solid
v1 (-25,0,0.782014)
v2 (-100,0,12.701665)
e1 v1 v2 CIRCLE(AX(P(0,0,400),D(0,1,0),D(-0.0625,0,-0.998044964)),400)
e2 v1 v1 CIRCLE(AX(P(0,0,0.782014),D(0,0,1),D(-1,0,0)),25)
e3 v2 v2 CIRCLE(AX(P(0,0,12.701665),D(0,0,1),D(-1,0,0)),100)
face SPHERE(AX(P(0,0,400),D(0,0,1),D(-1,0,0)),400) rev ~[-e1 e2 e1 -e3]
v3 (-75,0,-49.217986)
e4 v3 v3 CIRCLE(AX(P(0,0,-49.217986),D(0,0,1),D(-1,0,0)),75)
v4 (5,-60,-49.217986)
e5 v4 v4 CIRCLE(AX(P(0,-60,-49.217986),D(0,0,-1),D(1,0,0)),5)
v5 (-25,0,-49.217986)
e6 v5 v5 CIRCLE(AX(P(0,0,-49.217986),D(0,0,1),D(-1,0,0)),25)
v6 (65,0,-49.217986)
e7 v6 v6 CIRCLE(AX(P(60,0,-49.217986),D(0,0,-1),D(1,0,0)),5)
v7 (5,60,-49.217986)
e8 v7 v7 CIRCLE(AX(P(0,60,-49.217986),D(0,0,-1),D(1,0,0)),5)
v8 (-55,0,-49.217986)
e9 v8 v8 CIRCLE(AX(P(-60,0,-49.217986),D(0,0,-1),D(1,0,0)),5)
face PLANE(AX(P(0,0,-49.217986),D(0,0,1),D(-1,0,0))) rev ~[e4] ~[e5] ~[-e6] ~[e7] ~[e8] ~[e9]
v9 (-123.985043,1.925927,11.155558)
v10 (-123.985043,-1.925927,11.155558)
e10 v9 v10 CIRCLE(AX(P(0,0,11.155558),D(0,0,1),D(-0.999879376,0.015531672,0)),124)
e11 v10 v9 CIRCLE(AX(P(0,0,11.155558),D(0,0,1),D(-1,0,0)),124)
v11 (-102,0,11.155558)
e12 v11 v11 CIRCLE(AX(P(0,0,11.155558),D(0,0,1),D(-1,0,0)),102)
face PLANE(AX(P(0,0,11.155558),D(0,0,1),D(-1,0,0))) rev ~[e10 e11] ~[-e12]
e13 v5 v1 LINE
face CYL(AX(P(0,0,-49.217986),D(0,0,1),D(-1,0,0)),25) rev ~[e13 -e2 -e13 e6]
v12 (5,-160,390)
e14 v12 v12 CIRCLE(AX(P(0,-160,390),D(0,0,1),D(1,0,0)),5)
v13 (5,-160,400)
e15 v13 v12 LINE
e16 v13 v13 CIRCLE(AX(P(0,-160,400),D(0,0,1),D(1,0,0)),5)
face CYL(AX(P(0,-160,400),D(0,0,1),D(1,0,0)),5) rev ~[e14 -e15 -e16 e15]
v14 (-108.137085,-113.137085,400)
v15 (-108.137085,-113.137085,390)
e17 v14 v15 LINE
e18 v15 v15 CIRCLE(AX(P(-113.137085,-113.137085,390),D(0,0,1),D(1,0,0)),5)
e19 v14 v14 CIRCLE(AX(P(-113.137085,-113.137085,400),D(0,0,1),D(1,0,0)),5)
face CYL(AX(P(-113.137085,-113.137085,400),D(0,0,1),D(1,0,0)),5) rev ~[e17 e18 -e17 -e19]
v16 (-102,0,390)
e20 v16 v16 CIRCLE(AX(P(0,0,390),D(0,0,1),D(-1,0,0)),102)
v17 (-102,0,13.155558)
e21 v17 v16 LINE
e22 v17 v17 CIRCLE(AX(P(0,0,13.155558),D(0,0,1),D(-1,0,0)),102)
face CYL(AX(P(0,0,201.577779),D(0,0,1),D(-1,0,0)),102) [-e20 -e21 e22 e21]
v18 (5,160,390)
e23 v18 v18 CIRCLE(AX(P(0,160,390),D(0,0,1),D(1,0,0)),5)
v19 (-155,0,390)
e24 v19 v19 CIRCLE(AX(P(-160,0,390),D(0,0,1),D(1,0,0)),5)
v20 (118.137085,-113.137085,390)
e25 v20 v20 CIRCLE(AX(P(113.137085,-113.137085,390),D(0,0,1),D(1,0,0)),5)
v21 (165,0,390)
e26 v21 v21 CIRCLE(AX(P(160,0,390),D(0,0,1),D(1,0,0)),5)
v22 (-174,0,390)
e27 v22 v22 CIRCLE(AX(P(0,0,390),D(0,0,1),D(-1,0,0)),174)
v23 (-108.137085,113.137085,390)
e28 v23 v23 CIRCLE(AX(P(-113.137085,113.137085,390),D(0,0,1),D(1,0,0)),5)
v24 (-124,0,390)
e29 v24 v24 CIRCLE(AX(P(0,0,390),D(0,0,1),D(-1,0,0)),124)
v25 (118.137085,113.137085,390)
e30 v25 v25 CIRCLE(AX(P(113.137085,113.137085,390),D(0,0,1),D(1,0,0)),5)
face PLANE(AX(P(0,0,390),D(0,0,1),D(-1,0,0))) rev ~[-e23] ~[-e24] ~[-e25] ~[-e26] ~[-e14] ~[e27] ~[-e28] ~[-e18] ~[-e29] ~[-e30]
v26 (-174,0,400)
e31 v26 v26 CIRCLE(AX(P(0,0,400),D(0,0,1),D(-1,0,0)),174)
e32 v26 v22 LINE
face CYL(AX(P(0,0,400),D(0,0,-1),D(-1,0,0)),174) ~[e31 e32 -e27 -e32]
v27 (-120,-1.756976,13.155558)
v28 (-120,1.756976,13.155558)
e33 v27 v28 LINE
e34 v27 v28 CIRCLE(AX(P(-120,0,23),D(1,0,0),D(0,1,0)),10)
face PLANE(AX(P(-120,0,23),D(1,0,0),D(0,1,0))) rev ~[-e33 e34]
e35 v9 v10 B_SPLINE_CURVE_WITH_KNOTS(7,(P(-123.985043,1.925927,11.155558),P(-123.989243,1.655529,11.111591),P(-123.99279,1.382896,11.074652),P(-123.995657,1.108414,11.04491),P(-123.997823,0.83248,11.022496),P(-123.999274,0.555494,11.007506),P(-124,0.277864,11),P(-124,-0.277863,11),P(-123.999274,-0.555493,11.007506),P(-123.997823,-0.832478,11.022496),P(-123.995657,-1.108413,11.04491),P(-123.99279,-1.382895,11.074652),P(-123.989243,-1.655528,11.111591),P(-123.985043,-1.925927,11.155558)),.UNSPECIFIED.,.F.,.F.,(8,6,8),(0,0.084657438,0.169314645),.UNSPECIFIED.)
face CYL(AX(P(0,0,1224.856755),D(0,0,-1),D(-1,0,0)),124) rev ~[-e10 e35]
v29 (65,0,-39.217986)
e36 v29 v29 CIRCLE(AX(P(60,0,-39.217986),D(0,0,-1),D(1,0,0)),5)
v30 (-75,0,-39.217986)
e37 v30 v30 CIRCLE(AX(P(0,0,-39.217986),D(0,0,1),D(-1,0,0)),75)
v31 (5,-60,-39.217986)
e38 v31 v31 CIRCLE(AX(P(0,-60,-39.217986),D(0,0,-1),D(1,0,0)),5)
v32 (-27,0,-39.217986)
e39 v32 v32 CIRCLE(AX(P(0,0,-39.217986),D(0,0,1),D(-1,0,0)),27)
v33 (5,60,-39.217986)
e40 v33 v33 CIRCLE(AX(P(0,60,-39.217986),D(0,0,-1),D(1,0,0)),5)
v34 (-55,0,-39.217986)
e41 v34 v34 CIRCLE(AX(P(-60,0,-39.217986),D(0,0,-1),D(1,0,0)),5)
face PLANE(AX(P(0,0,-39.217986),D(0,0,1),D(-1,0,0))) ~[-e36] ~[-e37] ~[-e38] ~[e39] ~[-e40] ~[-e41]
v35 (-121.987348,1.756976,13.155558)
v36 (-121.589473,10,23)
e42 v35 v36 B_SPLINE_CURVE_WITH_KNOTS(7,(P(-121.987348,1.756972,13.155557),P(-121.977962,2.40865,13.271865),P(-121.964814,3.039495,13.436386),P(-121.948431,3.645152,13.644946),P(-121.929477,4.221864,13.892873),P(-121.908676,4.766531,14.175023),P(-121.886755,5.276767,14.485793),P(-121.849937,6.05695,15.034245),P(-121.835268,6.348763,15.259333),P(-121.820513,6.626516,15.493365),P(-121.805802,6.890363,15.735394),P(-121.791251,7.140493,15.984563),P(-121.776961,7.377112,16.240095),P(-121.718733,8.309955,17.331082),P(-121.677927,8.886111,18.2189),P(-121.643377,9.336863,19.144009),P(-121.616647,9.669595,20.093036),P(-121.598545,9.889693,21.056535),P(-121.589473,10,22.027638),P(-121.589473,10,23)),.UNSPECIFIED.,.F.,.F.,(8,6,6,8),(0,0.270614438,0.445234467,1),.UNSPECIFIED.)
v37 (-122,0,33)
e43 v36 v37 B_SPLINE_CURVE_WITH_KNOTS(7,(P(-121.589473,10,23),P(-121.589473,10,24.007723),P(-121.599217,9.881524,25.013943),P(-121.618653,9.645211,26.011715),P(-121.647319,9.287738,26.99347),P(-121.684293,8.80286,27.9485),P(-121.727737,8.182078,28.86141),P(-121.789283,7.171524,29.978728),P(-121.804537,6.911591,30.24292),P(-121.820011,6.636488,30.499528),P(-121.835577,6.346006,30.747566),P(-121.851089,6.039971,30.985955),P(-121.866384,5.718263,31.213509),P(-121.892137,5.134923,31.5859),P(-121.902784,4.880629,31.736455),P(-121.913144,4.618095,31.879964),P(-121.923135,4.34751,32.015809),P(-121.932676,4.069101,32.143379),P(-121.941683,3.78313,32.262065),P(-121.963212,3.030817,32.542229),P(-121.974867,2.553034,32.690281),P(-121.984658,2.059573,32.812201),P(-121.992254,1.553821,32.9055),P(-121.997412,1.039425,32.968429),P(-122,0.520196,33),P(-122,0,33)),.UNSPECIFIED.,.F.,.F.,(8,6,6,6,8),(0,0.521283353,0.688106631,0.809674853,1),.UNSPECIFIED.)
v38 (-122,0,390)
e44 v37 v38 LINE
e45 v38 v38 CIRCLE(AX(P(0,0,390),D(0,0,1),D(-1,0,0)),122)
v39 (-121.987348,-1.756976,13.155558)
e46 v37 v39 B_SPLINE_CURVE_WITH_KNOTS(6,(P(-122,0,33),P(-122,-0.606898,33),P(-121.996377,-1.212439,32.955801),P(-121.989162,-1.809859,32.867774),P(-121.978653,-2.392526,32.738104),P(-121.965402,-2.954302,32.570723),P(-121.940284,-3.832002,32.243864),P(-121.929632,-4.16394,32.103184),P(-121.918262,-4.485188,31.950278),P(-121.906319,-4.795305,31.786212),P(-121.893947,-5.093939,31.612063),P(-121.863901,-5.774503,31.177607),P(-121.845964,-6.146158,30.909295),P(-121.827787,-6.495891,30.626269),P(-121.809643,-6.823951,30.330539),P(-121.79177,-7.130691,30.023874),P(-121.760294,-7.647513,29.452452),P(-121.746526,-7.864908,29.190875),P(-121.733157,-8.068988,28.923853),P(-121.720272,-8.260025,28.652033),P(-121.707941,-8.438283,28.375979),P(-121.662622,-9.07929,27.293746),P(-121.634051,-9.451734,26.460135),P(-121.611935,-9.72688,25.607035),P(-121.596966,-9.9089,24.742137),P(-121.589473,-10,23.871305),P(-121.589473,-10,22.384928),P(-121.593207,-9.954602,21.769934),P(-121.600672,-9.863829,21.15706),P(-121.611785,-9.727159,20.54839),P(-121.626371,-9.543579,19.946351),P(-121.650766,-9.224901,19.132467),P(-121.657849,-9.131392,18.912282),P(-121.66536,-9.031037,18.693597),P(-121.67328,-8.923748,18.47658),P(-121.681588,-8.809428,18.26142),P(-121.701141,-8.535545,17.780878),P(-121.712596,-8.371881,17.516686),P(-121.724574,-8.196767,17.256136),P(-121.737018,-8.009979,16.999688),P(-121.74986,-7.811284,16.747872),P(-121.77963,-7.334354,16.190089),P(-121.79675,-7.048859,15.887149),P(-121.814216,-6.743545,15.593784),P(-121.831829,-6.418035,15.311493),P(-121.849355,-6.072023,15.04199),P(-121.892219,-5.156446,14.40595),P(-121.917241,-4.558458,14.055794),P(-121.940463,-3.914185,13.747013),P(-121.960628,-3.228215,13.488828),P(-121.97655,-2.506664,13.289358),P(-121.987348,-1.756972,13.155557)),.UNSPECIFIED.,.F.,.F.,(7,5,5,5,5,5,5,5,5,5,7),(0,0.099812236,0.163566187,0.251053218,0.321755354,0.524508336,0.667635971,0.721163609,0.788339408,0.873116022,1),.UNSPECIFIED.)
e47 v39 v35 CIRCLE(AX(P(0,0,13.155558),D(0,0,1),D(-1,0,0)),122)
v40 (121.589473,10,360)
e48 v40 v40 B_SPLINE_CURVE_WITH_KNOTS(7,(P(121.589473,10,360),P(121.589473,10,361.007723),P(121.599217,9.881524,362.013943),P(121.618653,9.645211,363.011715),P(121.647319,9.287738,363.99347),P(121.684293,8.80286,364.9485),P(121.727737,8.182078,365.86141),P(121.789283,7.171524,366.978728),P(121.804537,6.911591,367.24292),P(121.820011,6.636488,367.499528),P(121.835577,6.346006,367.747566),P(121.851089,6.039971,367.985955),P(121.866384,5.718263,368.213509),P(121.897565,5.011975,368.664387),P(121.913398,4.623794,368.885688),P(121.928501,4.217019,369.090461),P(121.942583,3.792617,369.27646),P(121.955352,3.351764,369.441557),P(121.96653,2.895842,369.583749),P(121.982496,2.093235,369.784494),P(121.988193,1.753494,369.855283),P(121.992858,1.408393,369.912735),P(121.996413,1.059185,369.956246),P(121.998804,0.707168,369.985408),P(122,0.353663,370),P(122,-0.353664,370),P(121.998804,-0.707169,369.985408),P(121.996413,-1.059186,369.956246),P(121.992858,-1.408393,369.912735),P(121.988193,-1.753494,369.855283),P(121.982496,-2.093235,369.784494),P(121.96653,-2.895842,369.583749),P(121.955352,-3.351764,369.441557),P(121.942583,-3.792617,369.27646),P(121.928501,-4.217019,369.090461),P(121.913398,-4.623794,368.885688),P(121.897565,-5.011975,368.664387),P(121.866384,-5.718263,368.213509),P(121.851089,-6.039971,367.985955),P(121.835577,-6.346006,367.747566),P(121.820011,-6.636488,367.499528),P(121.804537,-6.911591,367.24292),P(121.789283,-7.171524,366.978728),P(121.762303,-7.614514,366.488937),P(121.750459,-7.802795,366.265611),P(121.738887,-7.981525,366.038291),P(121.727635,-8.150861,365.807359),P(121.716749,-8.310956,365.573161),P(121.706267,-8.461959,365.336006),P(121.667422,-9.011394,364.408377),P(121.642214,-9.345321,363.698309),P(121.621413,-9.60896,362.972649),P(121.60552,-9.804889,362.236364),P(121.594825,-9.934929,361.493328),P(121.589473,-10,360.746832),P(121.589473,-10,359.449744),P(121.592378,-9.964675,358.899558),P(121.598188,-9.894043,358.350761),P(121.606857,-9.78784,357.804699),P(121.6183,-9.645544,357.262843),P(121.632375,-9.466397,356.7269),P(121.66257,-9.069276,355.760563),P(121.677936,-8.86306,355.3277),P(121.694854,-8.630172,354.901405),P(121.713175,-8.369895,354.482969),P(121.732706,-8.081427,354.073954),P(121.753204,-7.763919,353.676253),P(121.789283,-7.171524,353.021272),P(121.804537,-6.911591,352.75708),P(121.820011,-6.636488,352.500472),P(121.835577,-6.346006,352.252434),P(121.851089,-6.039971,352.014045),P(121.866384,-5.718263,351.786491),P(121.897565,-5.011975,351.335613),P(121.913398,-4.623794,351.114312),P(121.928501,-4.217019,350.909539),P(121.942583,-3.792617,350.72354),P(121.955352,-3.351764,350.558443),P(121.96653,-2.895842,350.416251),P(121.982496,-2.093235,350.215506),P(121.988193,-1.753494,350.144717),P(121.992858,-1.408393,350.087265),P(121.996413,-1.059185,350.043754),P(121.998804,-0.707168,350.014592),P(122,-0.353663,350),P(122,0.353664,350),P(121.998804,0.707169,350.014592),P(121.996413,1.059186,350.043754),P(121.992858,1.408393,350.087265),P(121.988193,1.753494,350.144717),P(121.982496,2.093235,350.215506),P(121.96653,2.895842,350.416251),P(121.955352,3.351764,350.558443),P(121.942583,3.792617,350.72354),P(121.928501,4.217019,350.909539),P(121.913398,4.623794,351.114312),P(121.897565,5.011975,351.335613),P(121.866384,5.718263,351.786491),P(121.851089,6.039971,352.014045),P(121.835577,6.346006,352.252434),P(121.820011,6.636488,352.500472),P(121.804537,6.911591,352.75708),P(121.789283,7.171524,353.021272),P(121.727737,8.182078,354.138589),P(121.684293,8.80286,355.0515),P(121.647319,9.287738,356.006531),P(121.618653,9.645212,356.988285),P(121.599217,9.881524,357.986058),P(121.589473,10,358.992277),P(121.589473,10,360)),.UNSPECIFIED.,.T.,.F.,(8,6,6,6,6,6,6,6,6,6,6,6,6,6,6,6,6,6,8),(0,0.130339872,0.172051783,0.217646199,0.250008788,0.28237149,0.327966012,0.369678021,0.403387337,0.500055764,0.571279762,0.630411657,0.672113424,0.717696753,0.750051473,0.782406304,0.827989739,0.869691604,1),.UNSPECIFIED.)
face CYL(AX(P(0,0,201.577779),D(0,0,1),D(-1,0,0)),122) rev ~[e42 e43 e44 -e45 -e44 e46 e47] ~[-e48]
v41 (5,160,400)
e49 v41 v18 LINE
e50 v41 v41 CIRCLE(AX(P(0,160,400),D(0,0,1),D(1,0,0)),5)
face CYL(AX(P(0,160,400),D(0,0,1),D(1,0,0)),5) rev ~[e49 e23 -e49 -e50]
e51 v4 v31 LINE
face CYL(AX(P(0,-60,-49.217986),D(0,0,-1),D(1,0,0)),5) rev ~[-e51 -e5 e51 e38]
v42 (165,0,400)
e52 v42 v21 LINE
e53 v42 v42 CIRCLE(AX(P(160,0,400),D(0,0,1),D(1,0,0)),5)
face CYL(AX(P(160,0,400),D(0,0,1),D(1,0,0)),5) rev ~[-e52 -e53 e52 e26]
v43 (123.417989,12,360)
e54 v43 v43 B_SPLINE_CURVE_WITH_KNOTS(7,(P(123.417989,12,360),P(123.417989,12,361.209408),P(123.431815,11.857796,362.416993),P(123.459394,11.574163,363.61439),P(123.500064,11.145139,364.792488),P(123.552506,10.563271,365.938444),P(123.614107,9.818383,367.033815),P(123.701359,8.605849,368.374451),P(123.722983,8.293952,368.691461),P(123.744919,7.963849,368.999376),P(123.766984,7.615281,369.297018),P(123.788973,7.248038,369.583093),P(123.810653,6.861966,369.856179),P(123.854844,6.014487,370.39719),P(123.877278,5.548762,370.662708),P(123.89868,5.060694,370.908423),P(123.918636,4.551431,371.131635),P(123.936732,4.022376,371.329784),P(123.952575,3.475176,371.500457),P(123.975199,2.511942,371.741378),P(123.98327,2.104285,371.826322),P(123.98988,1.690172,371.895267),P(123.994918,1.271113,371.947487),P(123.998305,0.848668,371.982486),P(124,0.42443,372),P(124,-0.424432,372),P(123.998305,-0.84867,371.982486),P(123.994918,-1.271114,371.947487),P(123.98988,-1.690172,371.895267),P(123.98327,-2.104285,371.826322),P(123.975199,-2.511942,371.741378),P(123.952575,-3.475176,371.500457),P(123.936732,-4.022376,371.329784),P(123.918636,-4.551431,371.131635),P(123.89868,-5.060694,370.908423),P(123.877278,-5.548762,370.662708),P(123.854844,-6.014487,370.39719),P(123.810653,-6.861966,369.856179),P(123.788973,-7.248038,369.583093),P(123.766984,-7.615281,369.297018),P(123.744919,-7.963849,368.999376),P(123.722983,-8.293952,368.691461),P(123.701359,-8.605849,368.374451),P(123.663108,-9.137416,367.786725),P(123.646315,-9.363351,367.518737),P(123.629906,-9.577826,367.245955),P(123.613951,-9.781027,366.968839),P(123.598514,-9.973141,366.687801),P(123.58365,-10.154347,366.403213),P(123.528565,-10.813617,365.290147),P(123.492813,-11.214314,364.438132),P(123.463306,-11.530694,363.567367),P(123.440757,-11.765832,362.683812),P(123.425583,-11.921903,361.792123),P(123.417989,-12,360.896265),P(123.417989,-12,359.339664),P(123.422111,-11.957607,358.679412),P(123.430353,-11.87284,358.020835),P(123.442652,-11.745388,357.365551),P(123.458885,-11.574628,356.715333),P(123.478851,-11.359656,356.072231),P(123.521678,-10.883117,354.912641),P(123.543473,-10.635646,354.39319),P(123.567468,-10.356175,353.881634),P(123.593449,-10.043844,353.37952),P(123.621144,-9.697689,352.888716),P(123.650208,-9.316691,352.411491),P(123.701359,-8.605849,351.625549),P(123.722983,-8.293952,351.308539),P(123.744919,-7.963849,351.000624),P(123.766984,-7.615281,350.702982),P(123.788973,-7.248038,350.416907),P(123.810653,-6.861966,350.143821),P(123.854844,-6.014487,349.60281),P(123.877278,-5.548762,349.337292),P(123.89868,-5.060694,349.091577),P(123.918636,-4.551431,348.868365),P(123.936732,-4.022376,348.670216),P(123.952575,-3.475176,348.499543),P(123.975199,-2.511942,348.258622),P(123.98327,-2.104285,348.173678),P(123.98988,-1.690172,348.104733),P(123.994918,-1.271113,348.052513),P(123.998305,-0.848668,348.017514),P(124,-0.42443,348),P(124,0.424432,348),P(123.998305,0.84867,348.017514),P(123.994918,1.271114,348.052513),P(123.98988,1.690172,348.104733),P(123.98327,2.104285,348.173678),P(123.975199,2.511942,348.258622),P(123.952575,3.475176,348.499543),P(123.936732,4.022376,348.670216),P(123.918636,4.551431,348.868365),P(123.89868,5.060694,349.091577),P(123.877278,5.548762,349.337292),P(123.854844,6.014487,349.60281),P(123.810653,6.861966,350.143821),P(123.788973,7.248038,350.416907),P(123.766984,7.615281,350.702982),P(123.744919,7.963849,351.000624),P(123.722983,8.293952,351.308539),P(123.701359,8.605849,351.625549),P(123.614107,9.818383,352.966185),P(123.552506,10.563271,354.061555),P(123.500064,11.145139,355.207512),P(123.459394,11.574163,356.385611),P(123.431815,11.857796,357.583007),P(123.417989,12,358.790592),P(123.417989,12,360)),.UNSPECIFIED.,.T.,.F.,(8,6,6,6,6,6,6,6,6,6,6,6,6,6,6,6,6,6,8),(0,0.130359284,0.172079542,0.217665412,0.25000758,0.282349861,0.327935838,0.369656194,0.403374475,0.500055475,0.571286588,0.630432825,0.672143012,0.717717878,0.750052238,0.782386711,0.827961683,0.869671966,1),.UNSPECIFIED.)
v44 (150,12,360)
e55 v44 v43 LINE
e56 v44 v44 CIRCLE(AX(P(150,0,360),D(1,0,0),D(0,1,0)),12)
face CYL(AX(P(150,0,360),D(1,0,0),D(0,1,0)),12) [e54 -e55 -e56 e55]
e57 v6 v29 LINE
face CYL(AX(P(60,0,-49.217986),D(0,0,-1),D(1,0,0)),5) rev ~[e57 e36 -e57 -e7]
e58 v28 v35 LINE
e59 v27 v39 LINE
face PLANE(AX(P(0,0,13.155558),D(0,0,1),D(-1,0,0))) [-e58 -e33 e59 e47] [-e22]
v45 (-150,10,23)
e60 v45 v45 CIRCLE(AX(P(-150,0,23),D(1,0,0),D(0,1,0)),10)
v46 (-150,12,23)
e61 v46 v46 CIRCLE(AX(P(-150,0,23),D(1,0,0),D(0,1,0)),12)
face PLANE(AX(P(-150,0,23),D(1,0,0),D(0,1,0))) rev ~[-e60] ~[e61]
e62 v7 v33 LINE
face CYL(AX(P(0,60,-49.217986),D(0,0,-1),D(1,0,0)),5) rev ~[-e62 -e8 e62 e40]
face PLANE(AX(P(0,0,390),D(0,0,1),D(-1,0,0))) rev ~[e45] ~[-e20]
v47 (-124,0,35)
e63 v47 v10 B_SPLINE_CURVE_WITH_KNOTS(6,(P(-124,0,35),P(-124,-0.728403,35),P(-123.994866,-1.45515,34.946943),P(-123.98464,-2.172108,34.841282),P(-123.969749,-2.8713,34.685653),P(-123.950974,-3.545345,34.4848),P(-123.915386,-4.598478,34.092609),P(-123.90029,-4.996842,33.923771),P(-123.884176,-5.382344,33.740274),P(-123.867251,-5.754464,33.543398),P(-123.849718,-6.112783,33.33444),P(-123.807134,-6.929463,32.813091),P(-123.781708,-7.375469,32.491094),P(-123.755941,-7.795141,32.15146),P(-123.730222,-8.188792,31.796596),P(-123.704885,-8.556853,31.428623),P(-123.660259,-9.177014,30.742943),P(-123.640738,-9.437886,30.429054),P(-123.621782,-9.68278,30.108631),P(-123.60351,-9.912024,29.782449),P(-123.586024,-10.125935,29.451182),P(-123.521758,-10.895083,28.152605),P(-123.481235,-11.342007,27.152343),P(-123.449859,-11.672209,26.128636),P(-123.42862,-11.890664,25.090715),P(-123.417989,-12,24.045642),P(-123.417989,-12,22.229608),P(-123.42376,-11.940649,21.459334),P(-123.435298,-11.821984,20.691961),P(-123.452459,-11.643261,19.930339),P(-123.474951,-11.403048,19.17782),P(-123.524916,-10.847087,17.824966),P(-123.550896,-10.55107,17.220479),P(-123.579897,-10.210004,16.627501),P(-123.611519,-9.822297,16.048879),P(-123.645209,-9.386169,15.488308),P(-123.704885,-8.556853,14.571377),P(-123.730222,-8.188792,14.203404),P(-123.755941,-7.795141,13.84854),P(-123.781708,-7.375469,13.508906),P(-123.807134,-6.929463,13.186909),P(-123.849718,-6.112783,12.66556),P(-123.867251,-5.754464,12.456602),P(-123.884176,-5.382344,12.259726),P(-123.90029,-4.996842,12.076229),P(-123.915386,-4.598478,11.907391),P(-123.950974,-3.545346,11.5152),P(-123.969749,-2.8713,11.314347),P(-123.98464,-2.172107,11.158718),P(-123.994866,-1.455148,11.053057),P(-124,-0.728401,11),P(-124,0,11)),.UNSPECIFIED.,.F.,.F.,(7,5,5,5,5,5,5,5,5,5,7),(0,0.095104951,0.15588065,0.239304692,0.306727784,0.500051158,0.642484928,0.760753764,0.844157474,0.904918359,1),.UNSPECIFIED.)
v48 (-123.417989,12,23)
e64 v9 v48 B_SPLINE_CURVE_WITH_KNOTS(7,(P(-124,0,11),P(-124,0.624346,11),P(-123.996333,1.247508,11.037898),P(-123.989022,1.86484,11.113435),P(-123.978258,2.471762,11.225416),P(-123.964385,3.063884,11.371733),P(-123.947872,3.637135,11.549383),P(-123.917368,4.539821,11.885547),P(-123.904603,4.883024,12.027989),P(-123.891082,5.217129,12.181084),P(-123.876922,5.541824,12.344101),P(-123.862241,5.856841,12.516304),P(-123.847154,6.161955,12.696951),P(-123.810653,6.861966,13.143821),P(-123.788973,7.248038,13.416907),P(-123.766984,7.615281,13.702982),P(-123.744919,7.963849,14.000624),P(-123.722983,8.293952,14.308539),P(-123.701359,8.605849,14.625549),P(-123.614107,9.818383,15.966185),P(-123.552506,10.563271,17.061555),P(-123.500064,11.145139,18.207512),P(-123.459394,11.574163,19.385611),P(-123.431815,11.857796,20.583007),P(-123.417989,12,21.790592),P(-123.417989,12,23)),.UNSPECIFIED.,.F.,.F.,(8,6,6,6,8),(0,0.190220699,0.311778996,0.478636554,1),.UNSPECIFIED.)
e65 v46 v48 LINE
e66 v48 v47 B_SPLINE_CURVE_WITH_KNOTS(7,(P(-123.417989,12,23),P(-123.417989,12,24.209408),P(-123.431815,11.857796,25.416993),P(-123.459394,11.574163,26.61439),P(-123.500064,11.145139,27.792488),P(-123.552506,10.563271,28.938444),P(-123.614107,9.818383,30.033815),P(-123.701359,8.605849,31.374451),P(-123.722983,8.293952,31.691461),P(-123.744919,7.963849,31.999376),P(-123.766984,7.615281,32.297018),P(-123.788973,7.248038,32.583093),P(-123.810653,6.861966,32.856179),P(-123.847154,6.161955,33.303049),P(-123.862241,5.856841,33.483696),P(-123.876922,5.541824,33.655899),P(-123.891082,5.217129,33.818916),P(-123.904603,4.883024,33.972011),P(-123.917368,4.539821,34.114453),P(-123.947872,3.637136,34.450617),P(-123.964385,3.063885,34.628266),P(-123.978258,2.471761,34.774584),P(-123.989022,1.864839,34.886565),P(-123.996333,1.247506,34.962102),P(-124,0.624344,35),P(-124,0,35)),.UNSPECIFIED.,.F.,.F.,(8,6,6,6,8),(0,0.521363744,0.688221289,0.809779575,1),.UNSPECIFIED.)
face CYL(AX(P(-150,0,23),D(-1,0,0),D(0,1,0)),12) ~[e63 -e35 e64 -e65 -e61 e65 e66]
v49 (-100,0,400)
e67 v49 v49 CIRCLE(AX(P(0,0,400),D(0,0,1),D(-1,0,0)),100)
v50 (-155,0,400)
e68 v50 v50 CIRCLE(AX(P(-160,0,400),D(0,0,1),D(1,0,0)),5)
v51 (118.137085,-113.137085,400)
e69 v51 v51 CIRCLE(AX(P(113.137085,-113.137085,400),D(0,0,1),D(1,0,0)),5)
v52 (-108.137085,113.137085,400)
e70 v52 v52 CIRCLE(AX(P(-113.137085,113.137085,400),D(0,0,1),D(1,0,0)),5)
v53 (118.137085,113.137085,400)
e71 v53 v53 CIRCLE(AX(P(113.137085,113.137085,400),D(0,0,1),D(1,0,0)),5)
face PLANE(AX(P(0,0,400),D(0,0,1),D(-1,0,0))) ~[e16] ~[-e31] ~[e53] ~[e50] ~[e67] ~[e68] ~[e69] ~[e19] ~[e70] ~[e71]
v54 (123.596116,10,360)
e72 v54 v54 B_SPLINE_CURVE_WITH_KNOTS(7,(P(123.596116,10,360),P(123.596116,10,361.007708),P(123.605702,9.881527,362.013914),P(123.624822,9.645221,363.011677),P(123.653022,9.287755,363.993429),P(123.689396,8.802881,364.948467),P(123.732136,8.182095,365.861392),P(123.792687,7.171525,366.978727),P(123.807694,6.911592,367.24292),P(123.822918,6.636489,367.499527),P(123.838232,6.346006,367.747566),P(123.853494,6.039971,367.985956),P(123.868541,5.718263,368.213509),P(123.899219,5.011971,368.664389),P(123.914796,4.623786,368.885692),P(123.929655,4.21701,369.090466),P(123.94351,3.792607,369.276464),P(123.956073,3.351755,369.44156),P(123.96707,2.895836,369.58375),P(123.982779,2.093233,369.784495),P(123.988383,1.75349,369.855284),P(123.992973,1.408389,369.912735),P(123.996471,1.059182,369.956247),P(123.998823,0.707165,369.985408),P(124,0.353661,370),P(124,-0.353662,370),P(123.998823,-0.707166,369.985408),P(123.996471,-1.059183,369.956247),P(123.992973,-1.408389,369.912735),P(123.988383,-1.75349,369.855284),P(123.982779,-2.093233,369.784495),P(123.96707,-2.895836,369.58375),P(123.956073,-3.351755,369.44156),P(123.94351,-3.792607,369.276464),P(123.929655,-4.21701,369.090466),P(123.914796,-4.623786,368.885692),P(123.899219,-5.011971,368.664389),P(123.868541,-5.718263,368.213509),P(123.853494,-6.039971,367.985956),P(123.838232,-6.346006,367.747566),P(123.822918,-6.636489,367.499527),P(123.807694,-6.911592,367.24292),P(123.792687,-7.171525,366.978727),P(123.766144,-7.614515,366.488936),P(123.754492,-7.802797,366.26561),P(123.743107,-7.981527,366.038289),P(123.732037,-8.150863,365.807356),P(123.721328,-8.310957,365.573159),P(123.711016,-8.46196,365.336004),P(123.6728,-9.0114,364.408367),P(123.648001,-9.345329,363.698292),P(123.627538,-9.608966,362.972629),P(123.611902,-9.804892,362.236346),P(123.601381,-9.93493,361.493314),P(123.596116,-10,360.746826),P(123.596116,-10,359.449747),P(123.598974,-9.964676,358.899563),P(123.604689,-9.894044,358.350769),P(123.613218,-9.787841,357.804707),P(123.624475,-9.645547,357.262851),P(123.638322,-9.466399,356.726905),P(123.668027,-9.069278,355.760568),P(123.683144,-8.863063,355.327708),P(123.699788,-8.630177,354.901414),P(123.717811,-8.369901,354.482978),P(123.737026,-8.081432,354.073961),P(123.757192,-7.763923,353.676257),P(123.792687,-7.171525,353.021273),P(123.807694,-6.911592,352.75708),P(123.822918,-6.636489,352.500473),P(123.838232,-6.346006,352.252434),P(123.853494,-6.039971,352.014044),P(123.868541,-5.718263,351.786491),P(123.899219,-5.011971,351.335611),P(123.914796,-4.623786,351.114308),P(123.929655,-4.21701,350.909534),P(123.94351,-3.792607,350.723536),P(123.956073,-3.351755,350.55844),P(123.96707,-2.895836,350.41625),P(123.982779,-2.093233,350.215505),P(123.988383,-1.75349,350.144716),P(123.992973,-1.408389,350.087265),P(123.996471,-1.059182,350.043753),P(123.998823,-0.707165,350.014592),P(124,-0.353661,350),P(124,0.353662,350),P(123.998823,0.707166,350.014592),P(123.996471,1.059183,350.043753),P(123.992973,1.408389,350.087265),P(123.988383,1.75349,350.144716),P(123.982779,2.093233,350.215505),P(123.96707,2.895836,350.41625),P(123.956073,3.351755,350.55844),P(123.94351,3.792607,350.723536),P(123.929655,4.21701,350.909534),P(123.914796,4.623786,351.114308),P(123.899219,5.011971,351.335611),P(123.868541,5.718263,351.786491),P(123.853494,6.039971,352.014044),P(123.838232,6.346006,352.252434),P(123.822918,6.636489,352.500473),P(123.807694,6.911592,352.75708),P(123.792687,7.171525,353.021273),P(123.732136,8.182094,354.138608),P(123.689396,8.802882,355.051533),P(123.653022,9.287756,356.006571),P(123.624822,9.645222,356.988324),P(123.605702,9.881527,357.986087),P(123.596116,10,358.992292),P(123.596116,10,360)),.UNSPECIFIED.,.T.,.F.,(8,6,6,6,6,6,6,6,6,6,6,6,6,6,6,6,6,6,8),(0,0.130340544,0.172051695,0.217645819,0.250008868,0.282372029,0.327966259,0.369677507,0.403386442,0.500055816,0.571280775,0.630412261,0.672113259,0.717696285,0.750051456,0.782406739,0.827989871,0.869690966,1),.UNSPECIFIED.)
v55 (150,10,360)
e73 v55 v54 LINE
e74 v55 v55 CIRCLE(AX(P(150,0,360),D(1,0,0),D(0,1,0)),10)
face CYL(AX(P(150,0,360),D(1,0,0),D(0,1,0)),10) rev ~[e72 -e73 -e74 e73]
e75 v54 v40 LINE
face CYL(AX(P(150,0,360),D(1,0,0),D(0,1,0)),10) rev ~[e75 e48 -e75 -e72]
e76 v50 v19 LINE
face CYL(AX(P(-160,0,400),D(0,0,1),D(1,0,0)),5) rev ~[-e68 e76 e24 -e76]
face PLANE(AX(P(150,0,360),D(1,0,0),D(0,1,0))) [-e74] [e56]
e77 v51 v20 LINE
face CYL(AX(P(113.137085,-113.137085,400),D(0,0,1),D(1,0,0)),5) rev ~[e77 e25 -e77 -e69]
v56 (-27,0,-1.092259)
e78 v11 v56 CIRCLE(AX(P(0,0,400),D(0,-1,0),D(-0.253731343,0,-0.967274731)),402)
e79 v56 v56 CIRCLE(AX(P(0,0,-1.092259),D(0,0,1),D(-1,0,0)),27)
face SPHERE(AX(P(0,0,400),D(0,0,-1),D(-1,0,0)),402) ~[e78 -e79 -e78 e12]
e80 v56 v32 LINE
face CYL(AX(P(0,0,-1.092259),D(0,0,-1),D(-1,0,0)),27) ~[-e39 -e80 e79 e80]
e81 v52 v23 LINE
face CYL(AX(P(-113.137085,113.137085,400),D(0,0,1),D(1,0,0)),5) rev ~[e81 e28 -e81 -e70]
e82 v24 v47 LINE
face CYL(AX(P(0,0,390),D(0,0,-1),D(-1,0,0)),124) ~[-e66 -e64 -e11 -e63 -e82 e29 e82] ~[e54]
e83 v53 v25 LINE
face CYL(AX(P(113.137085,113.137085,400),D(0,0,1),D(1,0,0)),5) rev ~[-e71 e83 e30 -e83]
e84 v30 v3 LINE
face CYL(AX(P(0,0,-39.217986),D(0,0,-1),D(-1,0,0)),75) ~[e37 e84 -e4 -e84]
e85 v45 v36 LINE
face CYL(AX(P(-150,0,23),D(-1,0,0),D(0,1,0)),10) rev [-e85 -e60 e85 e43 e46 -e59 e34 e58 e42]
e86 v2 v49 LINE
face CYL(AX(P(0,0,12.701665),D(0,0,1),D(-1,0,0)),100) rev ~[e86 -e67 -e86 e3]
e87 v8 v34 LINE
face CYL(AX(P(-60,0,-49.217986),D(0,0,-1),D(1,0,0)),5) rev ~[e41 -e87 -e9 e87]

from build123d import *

# Parameters (mm, degrees)
F0_W          = 20
F0_H          = 376.8444419045
F6_END_RADIUS = 124
F5_R          = 12
F6_REACH      = 357.942125497
F4_R          = 10
F7_DEPTH      = 30
F9_R          = 12
F9_R_2        = 10
F11_R         = 10
F12_DEPTH     = 30
F13_R         = 5
F14_DEPTH     = 10
F15_R         = 5
F16_DEPTH     = 10


with BuildPart() as f1:
    # F0 (on Front) → F1 (revolve)
    with BuildSketch(Plane.XZ):
        with BuildLine():
            Line((-100, 12.7016653793), (-100, 400))
            Line((-100, 400), (-102, 400))
            Line((-102, 400), (-124, 400))
            Line((-124, 400), (-174, 400))
            Line((-174, 400), (-174, 390))
            Line((-174, 390), (-124, 390))
            Line((-124, 390), (-124, 11.1555580955))
            Line((-124, 11.1555580955), (-102, 11.1555580955))
            ThreePointArc((-102, 11.1555580955), (-64.7900629275, 3.2554376606), (-27, -1.0922587136))
            Line((-27, -1.0922587136), (-27, -39.2179855668))
            Line((-27, -39.2179855668), (-75, -39.2179855668))
            Line((-75, -39.2179855668), (-75, -49.2179855668))
            Line((-75, -49.2179855668), (-25, -49.2179855668))
            Line((-25, -49.2179855668), (-25, 0.7820144332))
            ThreePointArc((-25, 0.7820144332), (-62.7835131198, 4.9579383403), (-100, 12.7016653793))
        make_face()
        with Locations((-112, 201.5777790478)):
            Rectangle(F0_W, F0_H, mode=Mode.SUBTRACT)
    revolve(axis=Axis((0, 0, 200), (0, 0, 1)))

    f6_end = (Plane(origin=(0, 0, 200.5777790478), x_dir=(-1, 0, 0), z_dir=(0, 0, -1)) * Cylinder(F6_END_RADIUS, 2048.5579523277, mode=Mode.PRIVATE)).faces().sort_by_distance((124, 0, 200.5777790478))[0]
    # F5 (on offset) → F6 (join, up to the whole of a round face its end follows)
    with BuildSketch(Plane.YZ.offset(-150)):
        with Locations((0, 23)):
            Circle(F5_R)
    f6_long = extrude(amount=F6_REACH, mode=Mode.PRIVATE)
    add(split(f6_long, bisect_by=f6_end, keep=Keep.ALL, mode=Mode.PRIVATE).solids().sort_by_distance((-150, 0, 23))[0])

    # F4 (on offset) → F7 (cut)
    with BuildSketch(Plane.YZ.offset(-150)):
        with Locations((0, 23)):
            Circle(F4_R)
    extrude(amount=F7_DEPTH, mode=Mode.SUBTRACT)

    # F9 (on offset) → F10 (join, up to the next surface of F1)
    with BuildSketch(Plane.YZ.offset(150)):
        with Locations((0, 360)):
            Circle(F9_R)
        with Locations((0, 360)):
            Circle(F9_R_2, mode=Mode.SUBTRACT)
    extrude(until=Until.NEXT, dir=(-1, 0, 0))

    # F11 (on offset) → F12 (cut)
    with BuildSketch(Plane.YZ.offset(150)):
        with Locations((0, 360)):
            Circle(F11_R)
    extrude(amount=-F12_DEPTH, mode=Mode.SUBTRACT)

    # F13 (on face) → F14 (cut, through all)
    with BuildSketch(Plane(origin=(0, 0, -49.2179855668), x_dir=(1, 0, 0), z_dir=(0, 0, -1))):
        with Locations((0, 60)):
            Circle(F13_R)
        with Locations((60, 0)):
            Circle(F13_R)
        with Locations((0, -60)):
            Circle(F13_R)
        with Locations((-60, 0)):
            Circle(F13_R)
    extrude(amount=-F14_DEPTH, mode=Mode.SUBTRACT)

    # F15 (on face) → F16 (cut, through all)
    with BuildSketch(Plane.XY.offset(400)):
        with Locations((0, 160)):
            Circle(F15_R)
        with Locations((-113.1370849898, 113.1370849898)):
            Circle(F15_R)
        with Locations((-160, 0)):
            Circle(F15_R)
        with Locations((-113.1370849898, -113.1370849898)):
            Circle(F15_R)
        with Locations((0, -160)):
            Circle(F15_R)
        with Locations((113.1370849898, -113.1370849898)):
            Circle(F15_R)
        with Locations((160, 0)):
            Circle(F15_R)
        with Locations((113.1370849898, 113.1370849898)):
            Circle(F15_R)
    extrude(amount=-F16_DEPTH, mode=Mode.SUBTRACT)


solid = f1.part
